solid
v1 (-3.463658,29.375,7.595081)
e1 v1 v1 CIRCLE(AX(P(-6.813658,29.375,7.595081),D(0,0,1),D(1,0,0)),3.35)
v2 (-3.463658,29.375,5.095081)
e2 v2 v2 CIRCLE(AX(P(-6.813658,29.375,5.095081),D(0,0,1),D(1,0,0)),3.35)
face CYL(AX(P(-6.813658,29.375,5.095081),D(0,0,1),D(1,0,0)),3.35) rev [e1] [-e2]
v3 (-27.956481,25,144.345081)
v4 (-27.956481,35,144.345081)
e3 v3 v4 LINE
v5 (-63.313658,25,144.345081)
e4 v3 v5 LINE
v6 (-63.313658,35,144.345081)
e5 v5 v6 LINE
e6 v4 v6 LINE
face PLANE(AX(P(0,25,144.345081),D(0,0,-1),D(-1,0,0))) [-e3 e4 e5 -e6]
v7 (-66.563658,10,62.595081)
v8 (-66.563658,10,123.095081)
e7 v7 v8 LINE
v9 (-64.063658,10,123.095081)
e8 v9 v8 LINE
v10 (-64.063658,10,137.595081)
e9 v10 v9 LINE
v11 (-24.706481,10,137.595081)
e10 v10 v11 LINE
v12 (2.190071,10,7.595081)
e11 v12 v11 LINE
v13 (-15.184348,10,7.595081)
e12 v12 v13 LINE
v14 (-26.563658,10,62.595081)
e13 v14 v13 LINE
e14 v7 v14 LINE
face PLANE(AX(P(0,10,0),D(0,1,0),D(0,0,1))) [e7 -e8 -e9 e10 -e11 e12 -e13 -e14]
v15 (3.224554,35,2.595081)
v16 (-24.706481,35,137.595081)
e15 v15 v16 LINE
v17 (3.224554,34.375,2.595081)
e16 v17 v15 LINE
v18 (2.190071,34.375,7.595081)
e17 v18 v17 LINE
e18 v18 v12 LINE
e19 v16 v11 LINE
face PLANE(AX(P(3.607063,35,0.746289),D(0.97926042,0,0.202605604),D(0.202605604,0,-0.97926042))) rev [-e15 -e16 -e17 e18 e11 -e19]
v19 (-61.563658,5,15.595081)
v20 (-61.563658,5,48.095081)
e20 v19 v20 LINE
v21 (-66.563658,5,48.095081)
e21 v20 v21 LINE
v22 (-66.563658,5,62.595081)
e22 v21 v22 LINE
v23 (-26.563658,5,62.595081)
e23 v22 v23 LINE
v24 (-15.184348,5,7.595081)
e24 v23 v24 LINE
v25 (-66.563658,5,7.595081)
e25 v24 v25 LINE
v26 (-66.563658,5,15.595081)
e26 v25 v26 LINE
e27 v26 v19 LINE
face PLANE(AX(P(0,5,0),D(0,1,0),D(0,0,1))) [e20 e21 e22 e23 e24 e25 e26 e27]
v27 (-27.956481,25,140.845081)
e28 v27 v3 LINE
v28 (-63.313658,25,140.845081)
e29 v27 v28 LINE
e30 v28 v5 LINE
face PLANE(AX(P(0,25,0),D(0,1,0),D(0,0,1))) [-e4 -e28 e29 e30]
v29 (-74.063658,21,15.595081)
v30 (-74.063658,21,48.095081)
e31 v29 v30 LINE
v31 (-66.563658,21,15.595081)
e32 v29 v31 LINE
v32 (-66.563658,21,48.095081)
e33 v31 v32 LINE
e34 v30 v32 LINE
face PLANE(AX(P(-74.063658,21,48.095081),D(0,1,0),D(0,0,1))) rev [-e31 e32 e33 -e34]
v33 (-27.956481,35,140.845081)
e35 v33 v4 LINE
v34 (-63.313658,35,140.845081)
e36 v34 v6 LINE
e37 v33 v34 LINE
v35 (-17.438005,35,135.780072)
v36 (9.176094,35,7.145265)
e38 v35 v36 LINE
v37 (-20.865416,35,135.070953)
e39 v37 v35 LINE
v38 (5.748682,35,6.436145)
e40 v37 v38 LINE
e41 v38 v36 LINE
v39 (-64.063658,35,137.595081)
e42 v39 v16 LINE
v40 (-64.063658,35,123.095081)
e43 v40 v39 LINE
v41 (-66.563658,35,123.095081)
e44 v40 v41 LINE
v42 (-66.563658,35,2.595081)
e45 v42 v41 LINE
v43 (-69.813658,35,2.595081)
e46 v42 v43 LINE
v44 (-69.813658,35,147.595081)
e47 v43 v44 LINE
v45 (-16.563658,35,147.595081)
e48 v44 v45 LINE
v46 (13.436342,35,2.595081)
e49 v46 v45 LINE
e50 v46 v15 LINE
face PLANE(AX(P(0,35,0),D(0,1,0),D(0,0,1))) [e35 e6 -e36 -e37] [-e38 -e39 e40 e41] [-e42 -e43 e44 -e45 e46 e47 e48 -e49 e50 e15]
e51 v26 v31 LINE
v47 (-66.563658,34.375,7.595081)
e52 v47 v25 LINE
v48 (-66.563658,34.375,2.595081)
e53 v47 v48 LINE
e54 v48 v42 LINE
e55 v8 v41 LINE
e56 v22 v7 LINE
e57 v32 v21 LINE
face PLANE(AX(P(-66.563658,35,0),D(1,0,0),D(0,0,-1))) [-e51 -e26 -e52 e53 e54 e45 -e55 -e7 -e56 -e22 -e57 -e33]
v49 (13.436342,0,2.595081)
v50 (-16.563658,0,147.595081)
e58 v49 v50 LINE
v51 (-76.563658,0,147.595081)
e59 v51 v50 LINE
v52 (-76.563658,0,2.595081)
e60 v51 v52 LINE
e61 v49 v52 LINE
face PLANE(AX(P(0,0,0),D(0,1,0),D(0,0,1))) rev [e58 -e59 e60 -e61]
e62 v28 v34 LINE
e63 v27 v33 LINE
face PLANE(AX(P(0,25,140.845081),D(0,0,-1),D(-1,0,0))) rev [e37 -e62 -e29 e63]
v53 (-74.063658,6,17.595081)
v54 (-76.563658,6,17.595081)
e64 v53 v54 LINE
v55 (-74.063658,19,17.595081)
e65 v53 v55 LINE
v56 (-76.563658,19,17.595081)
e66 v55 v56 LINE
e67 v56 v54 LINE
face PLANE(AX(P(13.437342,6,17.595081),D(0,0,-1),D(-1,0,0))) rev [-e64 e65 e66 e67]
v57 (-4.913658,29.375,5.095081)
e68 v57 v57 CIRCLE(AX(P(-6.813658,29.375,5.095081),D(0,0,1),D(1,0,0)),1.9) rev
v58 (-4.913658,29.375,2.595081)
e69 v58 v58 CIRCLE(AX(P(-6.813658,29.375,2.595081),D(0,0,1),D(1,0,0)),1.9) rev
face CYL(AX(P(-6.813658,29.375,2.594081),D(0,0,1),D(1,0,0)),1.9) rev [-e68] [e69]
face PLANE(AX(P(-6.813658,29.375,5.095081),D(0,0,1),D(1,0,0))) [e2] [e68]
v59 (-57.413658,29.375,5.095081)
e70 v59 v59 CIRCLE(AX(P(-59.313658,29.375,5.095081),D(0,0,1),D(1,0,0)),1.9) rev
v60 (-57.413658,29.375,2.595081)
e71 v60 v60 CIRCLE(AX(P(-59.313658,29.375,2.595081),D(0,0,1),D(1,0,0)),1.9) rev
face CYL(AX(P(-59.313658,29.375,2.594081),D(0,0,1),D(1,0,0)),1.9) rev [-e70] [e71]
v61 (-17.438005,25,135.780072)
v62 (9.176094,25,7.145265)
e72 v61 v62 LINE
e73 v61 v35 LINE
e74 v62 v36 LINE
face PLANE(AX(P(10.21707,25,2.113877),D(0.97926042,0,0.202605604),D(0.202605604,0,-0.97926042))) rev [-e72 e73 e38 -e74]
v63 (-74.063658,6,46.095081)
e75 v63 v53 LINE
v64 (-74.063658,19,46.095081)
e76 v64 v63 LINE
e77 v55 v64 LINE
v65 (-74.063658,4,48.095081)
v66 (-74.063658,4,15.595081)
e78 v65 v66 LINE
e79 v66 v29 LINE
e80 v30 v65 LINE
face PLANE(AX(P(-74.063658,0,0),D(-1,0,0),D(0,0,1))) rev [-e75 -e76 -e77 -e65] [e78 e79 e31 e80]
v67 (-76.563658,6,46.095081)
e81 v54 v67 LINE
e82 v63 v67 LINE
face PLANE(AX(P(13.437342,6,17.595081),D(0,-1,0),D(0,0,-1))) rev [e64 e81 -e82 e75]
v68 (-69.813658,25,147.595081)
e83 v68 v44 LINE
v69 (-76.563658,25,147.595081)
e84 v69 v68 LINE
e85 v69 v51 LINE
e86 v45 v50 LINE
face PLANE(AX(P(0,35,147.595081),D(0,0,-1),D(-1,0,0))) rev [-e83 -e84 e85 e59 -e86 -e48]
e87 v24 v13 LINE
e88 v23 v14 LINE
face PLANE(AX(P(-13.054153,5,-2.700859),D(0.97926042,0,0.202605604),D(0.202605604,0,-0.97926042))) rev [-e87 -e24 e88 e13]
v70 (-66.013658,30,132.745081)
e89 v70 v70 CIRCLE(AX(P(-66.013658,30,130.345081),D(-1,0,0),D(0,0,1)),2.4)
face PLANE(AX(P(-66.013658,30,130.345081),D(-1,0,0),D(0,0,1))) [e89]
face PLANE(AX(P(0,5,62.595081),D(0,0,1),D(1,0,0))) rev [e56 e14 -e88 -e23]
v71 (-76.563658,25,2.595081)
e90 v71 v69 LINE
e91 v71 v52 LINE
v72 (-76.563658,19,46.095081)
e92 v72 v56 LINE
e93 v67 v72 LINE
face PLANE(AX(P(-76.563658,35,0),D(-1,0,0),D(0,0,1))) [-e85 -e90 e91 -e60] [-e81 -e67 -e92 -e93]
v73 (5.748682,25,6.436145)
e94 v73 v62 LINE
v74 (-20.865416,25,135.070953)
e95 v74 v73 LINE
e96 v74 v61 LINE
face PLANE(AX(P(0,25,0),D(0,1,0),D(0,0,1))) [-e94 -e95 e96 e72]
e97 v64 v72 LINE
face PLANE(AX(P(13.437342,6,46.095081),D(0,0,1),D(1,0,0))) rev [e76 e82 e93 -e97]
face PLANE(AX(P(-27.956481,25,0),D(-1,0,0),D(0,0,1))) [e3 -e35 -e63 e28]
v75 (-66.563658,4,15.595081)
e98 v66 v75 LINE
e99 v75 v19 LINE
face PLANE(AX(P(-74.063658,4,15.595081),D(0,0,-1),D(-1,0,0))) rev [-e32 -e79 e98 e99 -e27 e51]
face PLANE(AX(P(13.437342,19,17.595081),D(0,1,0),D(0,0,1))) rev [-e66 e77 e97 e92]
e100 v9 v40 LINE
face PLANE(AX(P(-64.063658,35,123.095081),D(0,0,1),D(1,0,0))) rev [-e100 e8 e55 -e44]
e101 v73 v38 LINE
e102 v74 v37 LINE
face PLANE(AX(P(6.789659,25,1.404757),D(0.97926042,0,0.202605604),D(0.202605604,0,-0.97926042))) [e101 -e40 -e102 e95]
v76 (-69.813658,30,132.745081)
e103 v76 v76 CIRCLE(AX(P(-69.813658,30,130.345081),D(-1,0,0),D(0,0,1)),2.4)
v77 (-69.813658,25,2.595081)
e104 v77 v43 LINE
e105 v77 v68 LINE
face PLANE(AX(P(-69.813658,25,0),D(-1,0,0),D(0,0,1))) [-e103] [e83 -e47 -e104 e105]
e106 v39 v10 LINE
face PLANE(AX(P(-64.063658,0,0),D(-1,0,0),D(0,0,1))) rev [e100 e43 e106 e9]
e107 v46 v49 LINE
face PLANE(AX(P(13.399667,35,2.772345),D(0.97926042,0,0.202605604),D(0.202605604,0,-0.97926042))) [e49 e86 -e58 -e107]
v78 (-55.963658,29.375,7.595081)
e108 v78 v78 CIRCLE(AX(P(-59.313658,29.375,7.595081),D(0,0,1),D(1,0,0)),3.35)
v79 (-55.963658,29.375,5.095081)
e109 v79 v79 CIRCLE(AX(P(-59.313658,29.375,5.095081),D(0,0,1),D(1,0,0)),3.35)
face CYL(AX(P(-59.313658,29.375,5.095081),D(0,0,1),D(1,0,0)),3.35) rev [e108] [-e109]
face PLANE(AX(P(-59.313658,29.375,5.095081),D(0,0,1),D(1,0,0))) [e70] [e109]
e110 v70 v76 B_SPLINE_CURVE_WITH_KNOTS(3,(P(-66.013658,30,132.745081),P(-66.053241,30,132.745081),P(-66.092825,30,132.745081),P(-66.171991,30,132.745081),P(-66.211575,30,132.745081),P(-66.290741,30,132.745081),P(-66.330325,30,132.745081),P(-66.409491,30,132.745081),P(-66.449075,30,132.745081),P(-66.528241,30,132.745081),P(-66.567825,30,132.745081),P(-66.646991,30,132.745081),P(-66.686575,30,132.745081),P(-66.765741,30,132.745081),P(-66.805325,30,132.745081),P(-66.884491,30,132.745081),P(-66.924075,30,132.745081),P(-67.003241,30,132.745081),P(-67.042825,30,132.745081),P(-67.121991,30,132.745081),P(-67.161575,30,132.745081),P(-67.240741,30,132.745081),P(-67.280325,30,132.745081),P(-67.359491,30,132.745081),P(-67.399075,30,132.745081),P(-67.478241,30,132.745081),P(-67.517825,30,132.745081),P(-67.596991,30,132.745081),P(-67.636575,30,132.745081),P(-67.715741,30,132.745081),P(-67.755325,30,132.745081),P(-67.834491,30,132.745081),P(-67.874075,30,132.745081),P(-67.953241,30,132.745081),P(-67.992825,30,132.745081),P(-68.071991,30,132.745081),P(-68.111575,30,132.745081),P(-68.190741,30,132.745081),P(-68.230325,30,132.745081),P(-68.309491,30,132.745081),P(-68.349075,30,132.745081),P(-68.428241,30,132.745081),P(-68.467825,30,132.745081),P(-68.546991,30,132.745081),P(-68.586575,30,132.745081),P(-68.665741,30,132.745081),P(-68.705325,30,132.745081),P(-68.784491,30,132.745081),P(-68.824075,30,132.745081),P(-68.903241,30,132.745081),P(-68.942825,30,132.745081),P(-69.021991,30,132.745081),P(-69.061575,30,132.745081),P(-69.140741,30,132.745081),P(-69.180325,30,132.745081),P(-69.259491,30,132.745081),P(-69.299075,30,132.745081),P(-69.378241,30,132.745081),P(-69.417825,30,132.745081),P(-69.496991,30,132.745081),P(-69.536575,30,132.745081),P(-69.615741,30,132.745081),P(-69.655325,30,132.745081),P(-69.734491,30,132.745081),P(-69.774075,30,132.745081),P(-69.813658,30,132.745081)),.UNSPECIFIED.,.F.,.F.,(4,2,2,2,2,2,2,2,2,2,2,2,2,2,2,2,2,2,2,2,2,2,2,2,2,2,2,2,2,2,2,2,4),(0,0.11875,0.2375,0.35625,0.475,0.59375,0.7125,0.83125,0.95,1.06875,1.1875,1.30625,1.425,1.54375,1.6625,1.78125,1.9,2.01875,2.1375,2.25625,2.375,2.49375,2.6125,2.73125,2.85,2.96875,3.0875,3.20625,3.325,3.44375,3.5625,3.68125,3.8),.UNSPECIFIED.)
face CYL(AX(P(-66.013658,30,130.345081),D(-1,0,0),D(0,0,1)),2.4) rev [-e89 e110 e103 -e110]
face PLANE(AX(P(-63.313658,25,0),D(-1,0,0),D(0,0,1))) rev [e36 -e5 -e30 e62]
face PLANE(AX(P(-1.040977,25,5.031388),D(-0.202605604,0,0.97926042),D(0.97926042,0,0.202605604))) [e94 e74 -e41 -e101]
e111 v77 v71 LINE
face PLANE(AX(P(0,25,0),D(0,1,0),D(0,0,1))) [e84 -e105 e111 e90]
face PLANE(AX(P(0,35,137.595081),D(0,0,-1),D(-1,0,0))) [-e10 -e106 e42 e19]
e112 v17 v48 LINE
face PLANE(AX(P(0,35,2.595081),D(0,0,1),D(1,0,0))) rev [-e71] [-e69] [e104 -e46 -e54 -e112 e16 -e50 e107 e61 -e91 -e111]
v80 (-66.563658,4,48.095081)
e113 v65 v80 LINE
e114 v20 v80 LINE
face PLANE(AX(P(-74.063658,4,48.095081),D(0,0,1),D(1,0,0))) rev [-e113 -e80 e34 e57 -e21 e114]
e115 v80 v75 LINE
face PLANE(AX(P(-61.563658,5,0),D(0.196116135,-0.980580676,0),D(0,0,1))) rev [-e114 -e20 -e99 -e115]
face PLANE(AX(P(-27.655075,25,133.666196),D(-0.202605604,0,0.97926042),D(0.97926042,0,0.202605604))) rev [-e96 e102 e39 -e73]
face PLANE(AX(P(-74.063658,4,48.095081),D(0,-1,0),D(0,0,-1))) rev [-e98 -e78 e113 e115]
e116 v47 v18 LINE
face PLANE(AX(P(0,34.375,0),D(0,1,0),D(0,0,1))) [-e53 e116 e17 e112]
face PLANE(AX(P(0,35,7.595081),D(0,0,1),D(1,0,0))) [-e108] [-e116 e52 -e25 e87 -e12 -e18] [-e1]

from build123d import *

# Parameters (mm, degrees)
BOSS_EXTRUDE1_DEPTH = 35
BOSS_EXTRUDE2_DEPTH = 10
SKETCH4_W           = 35.357177314
SKETCH4_H           = 3.5
CUT_EXTRUDE1_DEPTH  = 10
SKETCH5_W           = 68.753729038
SKETCH5_H           = 5
CUT_EXTRUDE2_DEPTH  = 0.625
CUT_EXTRUDE3_REACH  = 165.362
SKETCH6_R           = 1.9
SKETCH7_R           = 3.35
CUT_EXTRUDE4_DEPTH  = 2.5
LPATTERN1_COUNT     = 2
LPATTERN1_PITCH     = 52.5
SKETCH8_W           = 3.5
SKETCH8_H           = 145
SKETCH8_W_2         = 3.25
CUT_EXTRUDE5_DEPTH  = 10
SKETCH10_W          = 40
SKETCH10_H          = 55
CUT_EXTRUDE6_DEPTH  = 5
CUT_EXTRUDE7_REACH  = 178.378
SKETCH9_W           = 13
SKETCH9_H           = 28.5
SKETCH11_W          = 17
SKETCH11_H          = 32.5
SKETCH11_W_2        = 13
SKETCH11_H_2        = 28.5
CUT_EXTRUDE8_DEPTH  = 7.5
CHAMFER1_SIZE2      = 1
CHAMFER1_SIZE       = 5
SKETCH14_W          = 25
SKETCH14_H          = 14.5
BOSS_EXTRUDE3_DEPTH = 2.5
SKETCH13_R          = 2.4
CUT_EXTRUDE9_DEPTH  = 3.8


with BuildPart() as part:
    # Sketch1 → Boss-Extrude1 (new body)
    with BuildSketch(Plane(origin=(0, 0, 0), x_dir=(-1, 0, 0), z_dir=(0, 1, 0))):
        Polygon((66.563657866, 147.59508075), (16.563657866, 147.59508075), (26.356262061, 145.56902471), (24.706480552, 137.59508075), (66.563657866, 137.59508075), align=None)
        Polygon((26.356262061, 145.56902471), (16.563657866, 147.59508075), (16.563657866, 137.59508075), (24.706480552, 137.59508075), align=None)
        Polygon((16.563657866, 147.59508075), (-13.436342134, 2.59508075), (-8.436342134, 2.59508075), (-3.224553931, 2.59508075), (-3.224553931, 7.59508075), (-2.190071172, 7.59508075), (24.706480552, 137.59508075), (16.563657866, 137.59508075), align=None)
        Polygon((76.563657866, 147.59508075), (66.563657866, 147.59508075), (66.563657866, 137.59508075), (66.563657866, 7.59508075), (66.563657866, 2.59508075), (76.563657866, 2.59508075), align=None)
        Polygon((-3.224553931, 7.59508075), (-3.224553931, 2.59508075), (-2.190071172, 7.59508075), align=None)
        Polygon((-2.190071172, 7.59508075), (-3.224553931, 2.59508075), (66.563657866, 2.59508075), (66.563657866, 7.59508075), align=None)
    extrude(amount=BOSS_EXTRUDE1_DEPTH)

    # Sketch3 → Boss-Extrude2 (add)
    with BuildSketch(Plane.XZ):
        Polygon((-76.563657866, 147.59508075), (-16.563657866, 147.59508075), (13.436342134, 2.59508075), (-76.563657866, 2.59508075), align=None)
    extrude(amount=-BOSS_EXTRUDE2_DEPTH)

    # Sketch4 → Cut-Extrude1 (cut)
    with BuildSketch(Plane(origin=(0, 35, 0), x_dir=(-1, 0, 0), z_dir=(0, 1, 0))):
        Polygon((20.865415976, 135.0709526), (-5.748682081, 6.436145326), (-9.176093549, 7.145264941), (17.438004507, 135.780072214), align=None)
        with Locations((45.635069209, 142.59508075)):
            Rectangle(SKETCH4_W, SKETCH4_H)
    extrude(amount=-CUT_EXTRUDE1_DEPTH, mode=Mode.SUBTRACT)

    # Sketch5 → Cut-Extrude2 (cut)
    with BuildSketch(Plane(origin=(0, 35, -3.02991925), x_dir=(1, 0, 0), z_dir=(0, -1, 0))):
        Polygon((3.224553931, 5.625), (2.190071172, 10.625), (2.190071172, 5.625), align=None)
        with Locations((-32.186793347, 8.125)):
            Rectangle(SKETCH5_W, SKETCH5_H)
    extrude(amount=CUT_EXTRUDE2_DEPTH, mode=Mode.SUBTRACT)

    # Sketch6 → Cut-Extrude3 (cut, up to next)
    with BuildSketch(Plane.XY.offset(7.59508075), mode=Mode.PRIVATE) as cut_extrude3_sk1:
        with Locations((-59.313657866, 29.375)):
            Circle(SKETCH6_R)
    cut_extrude3_tool1 = extrude(cut_extrude3_sk1.sketch, amount=-CUT_EXTRUDE3_REACH, mode=Mode.PRIVATE) & part.part
    cut_extrude3 = cut_extrude3_tool1.solids().sort_by_distance((-59.313658, 29.375, 7.595081))[0]
    add(cut_extrude3, mode=Mode.SUBTRACT)

    # Sketch7 → Cut-Extrude4 (cut)
    with BuildSketch(Plane.XY.offset(7.59508075)):
        with Locations((-59.313657866, 29.375)):
            Circle(SKETCH7_R)
    cut_extrude4 = extrude(amount=-CUT_EXTRUDE4_DEPTH, mode=Mode.SUBTRACT)

    # LPattern1: Cut-Extrude3, Cut-Extrude4 ×2
    with Locations(*[(i * LPATTERN1_PITCH, 0, 0) for i in range(1, LPATTERN1_COUNT)]):
        add(cut_extrude3, mode=Mode.SUBTRACT)
        add(cut_extrude4, mode=Mode.SUBTRACT)

    # Sketch8 → Cut-Extrude5 (cut)
    with BuildSketch(Plane(origin=(0, 35, 0), x_dir=(-1, 0, 0), z_dir=(0, 1, 0))):
        with Locations((71.563657866, 75.09508075)):
            Rectangle(SKETCH8_W, SKETCH8_H)
        with Locations((74.938657866, 75.09508075)):
            Rectangle(SKETCH8_W_2, SKETCH8_H)
    extrude(amount=-CUT_EXTRUDE5_DEPTH, mode=Mode.SUBTRACT)

    # Sketch10 → Cut-Extrude6 (cut)
    with BuildSketch(Plane(origin=(0, 10, 0), x_dir=(-1, 0, 0), z_dir=(0, 1, 0))):
        Polygon((15.184347521, 7.59508075), (26.563657866, 7.59508075), (26.563657866, 62.59508075), align=None)
        with Locations((46.563657866, 35.09508075)):
            Rectangle(SKETCH10_W, SKETCH10_H)
    extrude(amount=-CUT_EXTRUDE6_DEPTH, mode=Mode.SUBTRACT)

    # Sketch9 → Cut-Extrude7 (cut, up to next)
    with BuildSketch(Plane(origin=(-76.563657866, 0, 0), x_dir=(0, -1, 0), z_dir=(-1, 0, 0)), mode=Mode.PRIVATE) as cut_extrude7_sk1:
        with Locations((-12.5, 31.84508075)):
            Rectangle(SKETCH9_W, SKETCH9_H)
    cut_extrude7_tool1 = extrude(cut_extrude7_sk1.sketch, amount=-CUT_EXTRUDE7_REACH, mode=Mode.PRIVATE) & part.part
    add(cut_extrude7_tool1.solids().sort_by_distance((-76.563658, 12.5, 31.845081))[0], mode=Mode.SUBTRACT)

    # Sketch11 → Cut-Extrude8 (cut)
    with BuildSketch(Plane.YZ.offset(-66.563657866)):
        with Locations((12.5, 31.84508075)):
            Rectangle(SKETCH11_W, SKETCH11_H)
        with Locations((12.5, 31.84508075)):
            Rectangle(SKETCH11_W_2, SKETCH11_H_2, mode=Mode.SUBTRACT)
    extrude(amount=-CUT_EXTRUDE8_DEPTH, mode=Mode.SUBTRACT)

    # Chamfer1
    chamfer1_edges = [part.edges().sort_by_distance(p)[0] for p in [
        (-66.563657866, 5, 31.84508075),
    ]]
    chamfer1_side = [part.faces().sort_by_distance(p)[0] for p in [
        (-66.543657866, 5, 31.84508075),
    ]]
    chamfer(chamfer1_edges, length=CHAMFER1_SIZE - 0.0001, length2=CHAMFER1_SIZE2 - 0.0001, reference=chamfer1_side[0])  # a hair under: the kernel refuses the full size

    # Sketch14 → Boss-Extrude3 (add)
    with BuildSketch(Plane.YZ.offset(-66.563657866)):
        with Locations((22.5, 130.34508075)):
            Rectangle(SKETCH14_W, SKETCH14_H)
    extrude(amount=BOSS_EXTRUDE3_DEPTH)

    # Sketch13 → Cut-Extrude9 (cut)
    with BuildSketch(Plane(origin=(-69.813657866, 0, 0), x_dir=(0, -1, 0), z_dir=(-1, 0, 0))):
        with Locations(Location((-30, 130.34508075, 0), (0, 0, 90))):
            Circle(SKETCH13_R)
    extrude(amount=-CUT_EXTRUDE9_DEPTH, mode=Mode.SUBTRACT)


solid = part.part
